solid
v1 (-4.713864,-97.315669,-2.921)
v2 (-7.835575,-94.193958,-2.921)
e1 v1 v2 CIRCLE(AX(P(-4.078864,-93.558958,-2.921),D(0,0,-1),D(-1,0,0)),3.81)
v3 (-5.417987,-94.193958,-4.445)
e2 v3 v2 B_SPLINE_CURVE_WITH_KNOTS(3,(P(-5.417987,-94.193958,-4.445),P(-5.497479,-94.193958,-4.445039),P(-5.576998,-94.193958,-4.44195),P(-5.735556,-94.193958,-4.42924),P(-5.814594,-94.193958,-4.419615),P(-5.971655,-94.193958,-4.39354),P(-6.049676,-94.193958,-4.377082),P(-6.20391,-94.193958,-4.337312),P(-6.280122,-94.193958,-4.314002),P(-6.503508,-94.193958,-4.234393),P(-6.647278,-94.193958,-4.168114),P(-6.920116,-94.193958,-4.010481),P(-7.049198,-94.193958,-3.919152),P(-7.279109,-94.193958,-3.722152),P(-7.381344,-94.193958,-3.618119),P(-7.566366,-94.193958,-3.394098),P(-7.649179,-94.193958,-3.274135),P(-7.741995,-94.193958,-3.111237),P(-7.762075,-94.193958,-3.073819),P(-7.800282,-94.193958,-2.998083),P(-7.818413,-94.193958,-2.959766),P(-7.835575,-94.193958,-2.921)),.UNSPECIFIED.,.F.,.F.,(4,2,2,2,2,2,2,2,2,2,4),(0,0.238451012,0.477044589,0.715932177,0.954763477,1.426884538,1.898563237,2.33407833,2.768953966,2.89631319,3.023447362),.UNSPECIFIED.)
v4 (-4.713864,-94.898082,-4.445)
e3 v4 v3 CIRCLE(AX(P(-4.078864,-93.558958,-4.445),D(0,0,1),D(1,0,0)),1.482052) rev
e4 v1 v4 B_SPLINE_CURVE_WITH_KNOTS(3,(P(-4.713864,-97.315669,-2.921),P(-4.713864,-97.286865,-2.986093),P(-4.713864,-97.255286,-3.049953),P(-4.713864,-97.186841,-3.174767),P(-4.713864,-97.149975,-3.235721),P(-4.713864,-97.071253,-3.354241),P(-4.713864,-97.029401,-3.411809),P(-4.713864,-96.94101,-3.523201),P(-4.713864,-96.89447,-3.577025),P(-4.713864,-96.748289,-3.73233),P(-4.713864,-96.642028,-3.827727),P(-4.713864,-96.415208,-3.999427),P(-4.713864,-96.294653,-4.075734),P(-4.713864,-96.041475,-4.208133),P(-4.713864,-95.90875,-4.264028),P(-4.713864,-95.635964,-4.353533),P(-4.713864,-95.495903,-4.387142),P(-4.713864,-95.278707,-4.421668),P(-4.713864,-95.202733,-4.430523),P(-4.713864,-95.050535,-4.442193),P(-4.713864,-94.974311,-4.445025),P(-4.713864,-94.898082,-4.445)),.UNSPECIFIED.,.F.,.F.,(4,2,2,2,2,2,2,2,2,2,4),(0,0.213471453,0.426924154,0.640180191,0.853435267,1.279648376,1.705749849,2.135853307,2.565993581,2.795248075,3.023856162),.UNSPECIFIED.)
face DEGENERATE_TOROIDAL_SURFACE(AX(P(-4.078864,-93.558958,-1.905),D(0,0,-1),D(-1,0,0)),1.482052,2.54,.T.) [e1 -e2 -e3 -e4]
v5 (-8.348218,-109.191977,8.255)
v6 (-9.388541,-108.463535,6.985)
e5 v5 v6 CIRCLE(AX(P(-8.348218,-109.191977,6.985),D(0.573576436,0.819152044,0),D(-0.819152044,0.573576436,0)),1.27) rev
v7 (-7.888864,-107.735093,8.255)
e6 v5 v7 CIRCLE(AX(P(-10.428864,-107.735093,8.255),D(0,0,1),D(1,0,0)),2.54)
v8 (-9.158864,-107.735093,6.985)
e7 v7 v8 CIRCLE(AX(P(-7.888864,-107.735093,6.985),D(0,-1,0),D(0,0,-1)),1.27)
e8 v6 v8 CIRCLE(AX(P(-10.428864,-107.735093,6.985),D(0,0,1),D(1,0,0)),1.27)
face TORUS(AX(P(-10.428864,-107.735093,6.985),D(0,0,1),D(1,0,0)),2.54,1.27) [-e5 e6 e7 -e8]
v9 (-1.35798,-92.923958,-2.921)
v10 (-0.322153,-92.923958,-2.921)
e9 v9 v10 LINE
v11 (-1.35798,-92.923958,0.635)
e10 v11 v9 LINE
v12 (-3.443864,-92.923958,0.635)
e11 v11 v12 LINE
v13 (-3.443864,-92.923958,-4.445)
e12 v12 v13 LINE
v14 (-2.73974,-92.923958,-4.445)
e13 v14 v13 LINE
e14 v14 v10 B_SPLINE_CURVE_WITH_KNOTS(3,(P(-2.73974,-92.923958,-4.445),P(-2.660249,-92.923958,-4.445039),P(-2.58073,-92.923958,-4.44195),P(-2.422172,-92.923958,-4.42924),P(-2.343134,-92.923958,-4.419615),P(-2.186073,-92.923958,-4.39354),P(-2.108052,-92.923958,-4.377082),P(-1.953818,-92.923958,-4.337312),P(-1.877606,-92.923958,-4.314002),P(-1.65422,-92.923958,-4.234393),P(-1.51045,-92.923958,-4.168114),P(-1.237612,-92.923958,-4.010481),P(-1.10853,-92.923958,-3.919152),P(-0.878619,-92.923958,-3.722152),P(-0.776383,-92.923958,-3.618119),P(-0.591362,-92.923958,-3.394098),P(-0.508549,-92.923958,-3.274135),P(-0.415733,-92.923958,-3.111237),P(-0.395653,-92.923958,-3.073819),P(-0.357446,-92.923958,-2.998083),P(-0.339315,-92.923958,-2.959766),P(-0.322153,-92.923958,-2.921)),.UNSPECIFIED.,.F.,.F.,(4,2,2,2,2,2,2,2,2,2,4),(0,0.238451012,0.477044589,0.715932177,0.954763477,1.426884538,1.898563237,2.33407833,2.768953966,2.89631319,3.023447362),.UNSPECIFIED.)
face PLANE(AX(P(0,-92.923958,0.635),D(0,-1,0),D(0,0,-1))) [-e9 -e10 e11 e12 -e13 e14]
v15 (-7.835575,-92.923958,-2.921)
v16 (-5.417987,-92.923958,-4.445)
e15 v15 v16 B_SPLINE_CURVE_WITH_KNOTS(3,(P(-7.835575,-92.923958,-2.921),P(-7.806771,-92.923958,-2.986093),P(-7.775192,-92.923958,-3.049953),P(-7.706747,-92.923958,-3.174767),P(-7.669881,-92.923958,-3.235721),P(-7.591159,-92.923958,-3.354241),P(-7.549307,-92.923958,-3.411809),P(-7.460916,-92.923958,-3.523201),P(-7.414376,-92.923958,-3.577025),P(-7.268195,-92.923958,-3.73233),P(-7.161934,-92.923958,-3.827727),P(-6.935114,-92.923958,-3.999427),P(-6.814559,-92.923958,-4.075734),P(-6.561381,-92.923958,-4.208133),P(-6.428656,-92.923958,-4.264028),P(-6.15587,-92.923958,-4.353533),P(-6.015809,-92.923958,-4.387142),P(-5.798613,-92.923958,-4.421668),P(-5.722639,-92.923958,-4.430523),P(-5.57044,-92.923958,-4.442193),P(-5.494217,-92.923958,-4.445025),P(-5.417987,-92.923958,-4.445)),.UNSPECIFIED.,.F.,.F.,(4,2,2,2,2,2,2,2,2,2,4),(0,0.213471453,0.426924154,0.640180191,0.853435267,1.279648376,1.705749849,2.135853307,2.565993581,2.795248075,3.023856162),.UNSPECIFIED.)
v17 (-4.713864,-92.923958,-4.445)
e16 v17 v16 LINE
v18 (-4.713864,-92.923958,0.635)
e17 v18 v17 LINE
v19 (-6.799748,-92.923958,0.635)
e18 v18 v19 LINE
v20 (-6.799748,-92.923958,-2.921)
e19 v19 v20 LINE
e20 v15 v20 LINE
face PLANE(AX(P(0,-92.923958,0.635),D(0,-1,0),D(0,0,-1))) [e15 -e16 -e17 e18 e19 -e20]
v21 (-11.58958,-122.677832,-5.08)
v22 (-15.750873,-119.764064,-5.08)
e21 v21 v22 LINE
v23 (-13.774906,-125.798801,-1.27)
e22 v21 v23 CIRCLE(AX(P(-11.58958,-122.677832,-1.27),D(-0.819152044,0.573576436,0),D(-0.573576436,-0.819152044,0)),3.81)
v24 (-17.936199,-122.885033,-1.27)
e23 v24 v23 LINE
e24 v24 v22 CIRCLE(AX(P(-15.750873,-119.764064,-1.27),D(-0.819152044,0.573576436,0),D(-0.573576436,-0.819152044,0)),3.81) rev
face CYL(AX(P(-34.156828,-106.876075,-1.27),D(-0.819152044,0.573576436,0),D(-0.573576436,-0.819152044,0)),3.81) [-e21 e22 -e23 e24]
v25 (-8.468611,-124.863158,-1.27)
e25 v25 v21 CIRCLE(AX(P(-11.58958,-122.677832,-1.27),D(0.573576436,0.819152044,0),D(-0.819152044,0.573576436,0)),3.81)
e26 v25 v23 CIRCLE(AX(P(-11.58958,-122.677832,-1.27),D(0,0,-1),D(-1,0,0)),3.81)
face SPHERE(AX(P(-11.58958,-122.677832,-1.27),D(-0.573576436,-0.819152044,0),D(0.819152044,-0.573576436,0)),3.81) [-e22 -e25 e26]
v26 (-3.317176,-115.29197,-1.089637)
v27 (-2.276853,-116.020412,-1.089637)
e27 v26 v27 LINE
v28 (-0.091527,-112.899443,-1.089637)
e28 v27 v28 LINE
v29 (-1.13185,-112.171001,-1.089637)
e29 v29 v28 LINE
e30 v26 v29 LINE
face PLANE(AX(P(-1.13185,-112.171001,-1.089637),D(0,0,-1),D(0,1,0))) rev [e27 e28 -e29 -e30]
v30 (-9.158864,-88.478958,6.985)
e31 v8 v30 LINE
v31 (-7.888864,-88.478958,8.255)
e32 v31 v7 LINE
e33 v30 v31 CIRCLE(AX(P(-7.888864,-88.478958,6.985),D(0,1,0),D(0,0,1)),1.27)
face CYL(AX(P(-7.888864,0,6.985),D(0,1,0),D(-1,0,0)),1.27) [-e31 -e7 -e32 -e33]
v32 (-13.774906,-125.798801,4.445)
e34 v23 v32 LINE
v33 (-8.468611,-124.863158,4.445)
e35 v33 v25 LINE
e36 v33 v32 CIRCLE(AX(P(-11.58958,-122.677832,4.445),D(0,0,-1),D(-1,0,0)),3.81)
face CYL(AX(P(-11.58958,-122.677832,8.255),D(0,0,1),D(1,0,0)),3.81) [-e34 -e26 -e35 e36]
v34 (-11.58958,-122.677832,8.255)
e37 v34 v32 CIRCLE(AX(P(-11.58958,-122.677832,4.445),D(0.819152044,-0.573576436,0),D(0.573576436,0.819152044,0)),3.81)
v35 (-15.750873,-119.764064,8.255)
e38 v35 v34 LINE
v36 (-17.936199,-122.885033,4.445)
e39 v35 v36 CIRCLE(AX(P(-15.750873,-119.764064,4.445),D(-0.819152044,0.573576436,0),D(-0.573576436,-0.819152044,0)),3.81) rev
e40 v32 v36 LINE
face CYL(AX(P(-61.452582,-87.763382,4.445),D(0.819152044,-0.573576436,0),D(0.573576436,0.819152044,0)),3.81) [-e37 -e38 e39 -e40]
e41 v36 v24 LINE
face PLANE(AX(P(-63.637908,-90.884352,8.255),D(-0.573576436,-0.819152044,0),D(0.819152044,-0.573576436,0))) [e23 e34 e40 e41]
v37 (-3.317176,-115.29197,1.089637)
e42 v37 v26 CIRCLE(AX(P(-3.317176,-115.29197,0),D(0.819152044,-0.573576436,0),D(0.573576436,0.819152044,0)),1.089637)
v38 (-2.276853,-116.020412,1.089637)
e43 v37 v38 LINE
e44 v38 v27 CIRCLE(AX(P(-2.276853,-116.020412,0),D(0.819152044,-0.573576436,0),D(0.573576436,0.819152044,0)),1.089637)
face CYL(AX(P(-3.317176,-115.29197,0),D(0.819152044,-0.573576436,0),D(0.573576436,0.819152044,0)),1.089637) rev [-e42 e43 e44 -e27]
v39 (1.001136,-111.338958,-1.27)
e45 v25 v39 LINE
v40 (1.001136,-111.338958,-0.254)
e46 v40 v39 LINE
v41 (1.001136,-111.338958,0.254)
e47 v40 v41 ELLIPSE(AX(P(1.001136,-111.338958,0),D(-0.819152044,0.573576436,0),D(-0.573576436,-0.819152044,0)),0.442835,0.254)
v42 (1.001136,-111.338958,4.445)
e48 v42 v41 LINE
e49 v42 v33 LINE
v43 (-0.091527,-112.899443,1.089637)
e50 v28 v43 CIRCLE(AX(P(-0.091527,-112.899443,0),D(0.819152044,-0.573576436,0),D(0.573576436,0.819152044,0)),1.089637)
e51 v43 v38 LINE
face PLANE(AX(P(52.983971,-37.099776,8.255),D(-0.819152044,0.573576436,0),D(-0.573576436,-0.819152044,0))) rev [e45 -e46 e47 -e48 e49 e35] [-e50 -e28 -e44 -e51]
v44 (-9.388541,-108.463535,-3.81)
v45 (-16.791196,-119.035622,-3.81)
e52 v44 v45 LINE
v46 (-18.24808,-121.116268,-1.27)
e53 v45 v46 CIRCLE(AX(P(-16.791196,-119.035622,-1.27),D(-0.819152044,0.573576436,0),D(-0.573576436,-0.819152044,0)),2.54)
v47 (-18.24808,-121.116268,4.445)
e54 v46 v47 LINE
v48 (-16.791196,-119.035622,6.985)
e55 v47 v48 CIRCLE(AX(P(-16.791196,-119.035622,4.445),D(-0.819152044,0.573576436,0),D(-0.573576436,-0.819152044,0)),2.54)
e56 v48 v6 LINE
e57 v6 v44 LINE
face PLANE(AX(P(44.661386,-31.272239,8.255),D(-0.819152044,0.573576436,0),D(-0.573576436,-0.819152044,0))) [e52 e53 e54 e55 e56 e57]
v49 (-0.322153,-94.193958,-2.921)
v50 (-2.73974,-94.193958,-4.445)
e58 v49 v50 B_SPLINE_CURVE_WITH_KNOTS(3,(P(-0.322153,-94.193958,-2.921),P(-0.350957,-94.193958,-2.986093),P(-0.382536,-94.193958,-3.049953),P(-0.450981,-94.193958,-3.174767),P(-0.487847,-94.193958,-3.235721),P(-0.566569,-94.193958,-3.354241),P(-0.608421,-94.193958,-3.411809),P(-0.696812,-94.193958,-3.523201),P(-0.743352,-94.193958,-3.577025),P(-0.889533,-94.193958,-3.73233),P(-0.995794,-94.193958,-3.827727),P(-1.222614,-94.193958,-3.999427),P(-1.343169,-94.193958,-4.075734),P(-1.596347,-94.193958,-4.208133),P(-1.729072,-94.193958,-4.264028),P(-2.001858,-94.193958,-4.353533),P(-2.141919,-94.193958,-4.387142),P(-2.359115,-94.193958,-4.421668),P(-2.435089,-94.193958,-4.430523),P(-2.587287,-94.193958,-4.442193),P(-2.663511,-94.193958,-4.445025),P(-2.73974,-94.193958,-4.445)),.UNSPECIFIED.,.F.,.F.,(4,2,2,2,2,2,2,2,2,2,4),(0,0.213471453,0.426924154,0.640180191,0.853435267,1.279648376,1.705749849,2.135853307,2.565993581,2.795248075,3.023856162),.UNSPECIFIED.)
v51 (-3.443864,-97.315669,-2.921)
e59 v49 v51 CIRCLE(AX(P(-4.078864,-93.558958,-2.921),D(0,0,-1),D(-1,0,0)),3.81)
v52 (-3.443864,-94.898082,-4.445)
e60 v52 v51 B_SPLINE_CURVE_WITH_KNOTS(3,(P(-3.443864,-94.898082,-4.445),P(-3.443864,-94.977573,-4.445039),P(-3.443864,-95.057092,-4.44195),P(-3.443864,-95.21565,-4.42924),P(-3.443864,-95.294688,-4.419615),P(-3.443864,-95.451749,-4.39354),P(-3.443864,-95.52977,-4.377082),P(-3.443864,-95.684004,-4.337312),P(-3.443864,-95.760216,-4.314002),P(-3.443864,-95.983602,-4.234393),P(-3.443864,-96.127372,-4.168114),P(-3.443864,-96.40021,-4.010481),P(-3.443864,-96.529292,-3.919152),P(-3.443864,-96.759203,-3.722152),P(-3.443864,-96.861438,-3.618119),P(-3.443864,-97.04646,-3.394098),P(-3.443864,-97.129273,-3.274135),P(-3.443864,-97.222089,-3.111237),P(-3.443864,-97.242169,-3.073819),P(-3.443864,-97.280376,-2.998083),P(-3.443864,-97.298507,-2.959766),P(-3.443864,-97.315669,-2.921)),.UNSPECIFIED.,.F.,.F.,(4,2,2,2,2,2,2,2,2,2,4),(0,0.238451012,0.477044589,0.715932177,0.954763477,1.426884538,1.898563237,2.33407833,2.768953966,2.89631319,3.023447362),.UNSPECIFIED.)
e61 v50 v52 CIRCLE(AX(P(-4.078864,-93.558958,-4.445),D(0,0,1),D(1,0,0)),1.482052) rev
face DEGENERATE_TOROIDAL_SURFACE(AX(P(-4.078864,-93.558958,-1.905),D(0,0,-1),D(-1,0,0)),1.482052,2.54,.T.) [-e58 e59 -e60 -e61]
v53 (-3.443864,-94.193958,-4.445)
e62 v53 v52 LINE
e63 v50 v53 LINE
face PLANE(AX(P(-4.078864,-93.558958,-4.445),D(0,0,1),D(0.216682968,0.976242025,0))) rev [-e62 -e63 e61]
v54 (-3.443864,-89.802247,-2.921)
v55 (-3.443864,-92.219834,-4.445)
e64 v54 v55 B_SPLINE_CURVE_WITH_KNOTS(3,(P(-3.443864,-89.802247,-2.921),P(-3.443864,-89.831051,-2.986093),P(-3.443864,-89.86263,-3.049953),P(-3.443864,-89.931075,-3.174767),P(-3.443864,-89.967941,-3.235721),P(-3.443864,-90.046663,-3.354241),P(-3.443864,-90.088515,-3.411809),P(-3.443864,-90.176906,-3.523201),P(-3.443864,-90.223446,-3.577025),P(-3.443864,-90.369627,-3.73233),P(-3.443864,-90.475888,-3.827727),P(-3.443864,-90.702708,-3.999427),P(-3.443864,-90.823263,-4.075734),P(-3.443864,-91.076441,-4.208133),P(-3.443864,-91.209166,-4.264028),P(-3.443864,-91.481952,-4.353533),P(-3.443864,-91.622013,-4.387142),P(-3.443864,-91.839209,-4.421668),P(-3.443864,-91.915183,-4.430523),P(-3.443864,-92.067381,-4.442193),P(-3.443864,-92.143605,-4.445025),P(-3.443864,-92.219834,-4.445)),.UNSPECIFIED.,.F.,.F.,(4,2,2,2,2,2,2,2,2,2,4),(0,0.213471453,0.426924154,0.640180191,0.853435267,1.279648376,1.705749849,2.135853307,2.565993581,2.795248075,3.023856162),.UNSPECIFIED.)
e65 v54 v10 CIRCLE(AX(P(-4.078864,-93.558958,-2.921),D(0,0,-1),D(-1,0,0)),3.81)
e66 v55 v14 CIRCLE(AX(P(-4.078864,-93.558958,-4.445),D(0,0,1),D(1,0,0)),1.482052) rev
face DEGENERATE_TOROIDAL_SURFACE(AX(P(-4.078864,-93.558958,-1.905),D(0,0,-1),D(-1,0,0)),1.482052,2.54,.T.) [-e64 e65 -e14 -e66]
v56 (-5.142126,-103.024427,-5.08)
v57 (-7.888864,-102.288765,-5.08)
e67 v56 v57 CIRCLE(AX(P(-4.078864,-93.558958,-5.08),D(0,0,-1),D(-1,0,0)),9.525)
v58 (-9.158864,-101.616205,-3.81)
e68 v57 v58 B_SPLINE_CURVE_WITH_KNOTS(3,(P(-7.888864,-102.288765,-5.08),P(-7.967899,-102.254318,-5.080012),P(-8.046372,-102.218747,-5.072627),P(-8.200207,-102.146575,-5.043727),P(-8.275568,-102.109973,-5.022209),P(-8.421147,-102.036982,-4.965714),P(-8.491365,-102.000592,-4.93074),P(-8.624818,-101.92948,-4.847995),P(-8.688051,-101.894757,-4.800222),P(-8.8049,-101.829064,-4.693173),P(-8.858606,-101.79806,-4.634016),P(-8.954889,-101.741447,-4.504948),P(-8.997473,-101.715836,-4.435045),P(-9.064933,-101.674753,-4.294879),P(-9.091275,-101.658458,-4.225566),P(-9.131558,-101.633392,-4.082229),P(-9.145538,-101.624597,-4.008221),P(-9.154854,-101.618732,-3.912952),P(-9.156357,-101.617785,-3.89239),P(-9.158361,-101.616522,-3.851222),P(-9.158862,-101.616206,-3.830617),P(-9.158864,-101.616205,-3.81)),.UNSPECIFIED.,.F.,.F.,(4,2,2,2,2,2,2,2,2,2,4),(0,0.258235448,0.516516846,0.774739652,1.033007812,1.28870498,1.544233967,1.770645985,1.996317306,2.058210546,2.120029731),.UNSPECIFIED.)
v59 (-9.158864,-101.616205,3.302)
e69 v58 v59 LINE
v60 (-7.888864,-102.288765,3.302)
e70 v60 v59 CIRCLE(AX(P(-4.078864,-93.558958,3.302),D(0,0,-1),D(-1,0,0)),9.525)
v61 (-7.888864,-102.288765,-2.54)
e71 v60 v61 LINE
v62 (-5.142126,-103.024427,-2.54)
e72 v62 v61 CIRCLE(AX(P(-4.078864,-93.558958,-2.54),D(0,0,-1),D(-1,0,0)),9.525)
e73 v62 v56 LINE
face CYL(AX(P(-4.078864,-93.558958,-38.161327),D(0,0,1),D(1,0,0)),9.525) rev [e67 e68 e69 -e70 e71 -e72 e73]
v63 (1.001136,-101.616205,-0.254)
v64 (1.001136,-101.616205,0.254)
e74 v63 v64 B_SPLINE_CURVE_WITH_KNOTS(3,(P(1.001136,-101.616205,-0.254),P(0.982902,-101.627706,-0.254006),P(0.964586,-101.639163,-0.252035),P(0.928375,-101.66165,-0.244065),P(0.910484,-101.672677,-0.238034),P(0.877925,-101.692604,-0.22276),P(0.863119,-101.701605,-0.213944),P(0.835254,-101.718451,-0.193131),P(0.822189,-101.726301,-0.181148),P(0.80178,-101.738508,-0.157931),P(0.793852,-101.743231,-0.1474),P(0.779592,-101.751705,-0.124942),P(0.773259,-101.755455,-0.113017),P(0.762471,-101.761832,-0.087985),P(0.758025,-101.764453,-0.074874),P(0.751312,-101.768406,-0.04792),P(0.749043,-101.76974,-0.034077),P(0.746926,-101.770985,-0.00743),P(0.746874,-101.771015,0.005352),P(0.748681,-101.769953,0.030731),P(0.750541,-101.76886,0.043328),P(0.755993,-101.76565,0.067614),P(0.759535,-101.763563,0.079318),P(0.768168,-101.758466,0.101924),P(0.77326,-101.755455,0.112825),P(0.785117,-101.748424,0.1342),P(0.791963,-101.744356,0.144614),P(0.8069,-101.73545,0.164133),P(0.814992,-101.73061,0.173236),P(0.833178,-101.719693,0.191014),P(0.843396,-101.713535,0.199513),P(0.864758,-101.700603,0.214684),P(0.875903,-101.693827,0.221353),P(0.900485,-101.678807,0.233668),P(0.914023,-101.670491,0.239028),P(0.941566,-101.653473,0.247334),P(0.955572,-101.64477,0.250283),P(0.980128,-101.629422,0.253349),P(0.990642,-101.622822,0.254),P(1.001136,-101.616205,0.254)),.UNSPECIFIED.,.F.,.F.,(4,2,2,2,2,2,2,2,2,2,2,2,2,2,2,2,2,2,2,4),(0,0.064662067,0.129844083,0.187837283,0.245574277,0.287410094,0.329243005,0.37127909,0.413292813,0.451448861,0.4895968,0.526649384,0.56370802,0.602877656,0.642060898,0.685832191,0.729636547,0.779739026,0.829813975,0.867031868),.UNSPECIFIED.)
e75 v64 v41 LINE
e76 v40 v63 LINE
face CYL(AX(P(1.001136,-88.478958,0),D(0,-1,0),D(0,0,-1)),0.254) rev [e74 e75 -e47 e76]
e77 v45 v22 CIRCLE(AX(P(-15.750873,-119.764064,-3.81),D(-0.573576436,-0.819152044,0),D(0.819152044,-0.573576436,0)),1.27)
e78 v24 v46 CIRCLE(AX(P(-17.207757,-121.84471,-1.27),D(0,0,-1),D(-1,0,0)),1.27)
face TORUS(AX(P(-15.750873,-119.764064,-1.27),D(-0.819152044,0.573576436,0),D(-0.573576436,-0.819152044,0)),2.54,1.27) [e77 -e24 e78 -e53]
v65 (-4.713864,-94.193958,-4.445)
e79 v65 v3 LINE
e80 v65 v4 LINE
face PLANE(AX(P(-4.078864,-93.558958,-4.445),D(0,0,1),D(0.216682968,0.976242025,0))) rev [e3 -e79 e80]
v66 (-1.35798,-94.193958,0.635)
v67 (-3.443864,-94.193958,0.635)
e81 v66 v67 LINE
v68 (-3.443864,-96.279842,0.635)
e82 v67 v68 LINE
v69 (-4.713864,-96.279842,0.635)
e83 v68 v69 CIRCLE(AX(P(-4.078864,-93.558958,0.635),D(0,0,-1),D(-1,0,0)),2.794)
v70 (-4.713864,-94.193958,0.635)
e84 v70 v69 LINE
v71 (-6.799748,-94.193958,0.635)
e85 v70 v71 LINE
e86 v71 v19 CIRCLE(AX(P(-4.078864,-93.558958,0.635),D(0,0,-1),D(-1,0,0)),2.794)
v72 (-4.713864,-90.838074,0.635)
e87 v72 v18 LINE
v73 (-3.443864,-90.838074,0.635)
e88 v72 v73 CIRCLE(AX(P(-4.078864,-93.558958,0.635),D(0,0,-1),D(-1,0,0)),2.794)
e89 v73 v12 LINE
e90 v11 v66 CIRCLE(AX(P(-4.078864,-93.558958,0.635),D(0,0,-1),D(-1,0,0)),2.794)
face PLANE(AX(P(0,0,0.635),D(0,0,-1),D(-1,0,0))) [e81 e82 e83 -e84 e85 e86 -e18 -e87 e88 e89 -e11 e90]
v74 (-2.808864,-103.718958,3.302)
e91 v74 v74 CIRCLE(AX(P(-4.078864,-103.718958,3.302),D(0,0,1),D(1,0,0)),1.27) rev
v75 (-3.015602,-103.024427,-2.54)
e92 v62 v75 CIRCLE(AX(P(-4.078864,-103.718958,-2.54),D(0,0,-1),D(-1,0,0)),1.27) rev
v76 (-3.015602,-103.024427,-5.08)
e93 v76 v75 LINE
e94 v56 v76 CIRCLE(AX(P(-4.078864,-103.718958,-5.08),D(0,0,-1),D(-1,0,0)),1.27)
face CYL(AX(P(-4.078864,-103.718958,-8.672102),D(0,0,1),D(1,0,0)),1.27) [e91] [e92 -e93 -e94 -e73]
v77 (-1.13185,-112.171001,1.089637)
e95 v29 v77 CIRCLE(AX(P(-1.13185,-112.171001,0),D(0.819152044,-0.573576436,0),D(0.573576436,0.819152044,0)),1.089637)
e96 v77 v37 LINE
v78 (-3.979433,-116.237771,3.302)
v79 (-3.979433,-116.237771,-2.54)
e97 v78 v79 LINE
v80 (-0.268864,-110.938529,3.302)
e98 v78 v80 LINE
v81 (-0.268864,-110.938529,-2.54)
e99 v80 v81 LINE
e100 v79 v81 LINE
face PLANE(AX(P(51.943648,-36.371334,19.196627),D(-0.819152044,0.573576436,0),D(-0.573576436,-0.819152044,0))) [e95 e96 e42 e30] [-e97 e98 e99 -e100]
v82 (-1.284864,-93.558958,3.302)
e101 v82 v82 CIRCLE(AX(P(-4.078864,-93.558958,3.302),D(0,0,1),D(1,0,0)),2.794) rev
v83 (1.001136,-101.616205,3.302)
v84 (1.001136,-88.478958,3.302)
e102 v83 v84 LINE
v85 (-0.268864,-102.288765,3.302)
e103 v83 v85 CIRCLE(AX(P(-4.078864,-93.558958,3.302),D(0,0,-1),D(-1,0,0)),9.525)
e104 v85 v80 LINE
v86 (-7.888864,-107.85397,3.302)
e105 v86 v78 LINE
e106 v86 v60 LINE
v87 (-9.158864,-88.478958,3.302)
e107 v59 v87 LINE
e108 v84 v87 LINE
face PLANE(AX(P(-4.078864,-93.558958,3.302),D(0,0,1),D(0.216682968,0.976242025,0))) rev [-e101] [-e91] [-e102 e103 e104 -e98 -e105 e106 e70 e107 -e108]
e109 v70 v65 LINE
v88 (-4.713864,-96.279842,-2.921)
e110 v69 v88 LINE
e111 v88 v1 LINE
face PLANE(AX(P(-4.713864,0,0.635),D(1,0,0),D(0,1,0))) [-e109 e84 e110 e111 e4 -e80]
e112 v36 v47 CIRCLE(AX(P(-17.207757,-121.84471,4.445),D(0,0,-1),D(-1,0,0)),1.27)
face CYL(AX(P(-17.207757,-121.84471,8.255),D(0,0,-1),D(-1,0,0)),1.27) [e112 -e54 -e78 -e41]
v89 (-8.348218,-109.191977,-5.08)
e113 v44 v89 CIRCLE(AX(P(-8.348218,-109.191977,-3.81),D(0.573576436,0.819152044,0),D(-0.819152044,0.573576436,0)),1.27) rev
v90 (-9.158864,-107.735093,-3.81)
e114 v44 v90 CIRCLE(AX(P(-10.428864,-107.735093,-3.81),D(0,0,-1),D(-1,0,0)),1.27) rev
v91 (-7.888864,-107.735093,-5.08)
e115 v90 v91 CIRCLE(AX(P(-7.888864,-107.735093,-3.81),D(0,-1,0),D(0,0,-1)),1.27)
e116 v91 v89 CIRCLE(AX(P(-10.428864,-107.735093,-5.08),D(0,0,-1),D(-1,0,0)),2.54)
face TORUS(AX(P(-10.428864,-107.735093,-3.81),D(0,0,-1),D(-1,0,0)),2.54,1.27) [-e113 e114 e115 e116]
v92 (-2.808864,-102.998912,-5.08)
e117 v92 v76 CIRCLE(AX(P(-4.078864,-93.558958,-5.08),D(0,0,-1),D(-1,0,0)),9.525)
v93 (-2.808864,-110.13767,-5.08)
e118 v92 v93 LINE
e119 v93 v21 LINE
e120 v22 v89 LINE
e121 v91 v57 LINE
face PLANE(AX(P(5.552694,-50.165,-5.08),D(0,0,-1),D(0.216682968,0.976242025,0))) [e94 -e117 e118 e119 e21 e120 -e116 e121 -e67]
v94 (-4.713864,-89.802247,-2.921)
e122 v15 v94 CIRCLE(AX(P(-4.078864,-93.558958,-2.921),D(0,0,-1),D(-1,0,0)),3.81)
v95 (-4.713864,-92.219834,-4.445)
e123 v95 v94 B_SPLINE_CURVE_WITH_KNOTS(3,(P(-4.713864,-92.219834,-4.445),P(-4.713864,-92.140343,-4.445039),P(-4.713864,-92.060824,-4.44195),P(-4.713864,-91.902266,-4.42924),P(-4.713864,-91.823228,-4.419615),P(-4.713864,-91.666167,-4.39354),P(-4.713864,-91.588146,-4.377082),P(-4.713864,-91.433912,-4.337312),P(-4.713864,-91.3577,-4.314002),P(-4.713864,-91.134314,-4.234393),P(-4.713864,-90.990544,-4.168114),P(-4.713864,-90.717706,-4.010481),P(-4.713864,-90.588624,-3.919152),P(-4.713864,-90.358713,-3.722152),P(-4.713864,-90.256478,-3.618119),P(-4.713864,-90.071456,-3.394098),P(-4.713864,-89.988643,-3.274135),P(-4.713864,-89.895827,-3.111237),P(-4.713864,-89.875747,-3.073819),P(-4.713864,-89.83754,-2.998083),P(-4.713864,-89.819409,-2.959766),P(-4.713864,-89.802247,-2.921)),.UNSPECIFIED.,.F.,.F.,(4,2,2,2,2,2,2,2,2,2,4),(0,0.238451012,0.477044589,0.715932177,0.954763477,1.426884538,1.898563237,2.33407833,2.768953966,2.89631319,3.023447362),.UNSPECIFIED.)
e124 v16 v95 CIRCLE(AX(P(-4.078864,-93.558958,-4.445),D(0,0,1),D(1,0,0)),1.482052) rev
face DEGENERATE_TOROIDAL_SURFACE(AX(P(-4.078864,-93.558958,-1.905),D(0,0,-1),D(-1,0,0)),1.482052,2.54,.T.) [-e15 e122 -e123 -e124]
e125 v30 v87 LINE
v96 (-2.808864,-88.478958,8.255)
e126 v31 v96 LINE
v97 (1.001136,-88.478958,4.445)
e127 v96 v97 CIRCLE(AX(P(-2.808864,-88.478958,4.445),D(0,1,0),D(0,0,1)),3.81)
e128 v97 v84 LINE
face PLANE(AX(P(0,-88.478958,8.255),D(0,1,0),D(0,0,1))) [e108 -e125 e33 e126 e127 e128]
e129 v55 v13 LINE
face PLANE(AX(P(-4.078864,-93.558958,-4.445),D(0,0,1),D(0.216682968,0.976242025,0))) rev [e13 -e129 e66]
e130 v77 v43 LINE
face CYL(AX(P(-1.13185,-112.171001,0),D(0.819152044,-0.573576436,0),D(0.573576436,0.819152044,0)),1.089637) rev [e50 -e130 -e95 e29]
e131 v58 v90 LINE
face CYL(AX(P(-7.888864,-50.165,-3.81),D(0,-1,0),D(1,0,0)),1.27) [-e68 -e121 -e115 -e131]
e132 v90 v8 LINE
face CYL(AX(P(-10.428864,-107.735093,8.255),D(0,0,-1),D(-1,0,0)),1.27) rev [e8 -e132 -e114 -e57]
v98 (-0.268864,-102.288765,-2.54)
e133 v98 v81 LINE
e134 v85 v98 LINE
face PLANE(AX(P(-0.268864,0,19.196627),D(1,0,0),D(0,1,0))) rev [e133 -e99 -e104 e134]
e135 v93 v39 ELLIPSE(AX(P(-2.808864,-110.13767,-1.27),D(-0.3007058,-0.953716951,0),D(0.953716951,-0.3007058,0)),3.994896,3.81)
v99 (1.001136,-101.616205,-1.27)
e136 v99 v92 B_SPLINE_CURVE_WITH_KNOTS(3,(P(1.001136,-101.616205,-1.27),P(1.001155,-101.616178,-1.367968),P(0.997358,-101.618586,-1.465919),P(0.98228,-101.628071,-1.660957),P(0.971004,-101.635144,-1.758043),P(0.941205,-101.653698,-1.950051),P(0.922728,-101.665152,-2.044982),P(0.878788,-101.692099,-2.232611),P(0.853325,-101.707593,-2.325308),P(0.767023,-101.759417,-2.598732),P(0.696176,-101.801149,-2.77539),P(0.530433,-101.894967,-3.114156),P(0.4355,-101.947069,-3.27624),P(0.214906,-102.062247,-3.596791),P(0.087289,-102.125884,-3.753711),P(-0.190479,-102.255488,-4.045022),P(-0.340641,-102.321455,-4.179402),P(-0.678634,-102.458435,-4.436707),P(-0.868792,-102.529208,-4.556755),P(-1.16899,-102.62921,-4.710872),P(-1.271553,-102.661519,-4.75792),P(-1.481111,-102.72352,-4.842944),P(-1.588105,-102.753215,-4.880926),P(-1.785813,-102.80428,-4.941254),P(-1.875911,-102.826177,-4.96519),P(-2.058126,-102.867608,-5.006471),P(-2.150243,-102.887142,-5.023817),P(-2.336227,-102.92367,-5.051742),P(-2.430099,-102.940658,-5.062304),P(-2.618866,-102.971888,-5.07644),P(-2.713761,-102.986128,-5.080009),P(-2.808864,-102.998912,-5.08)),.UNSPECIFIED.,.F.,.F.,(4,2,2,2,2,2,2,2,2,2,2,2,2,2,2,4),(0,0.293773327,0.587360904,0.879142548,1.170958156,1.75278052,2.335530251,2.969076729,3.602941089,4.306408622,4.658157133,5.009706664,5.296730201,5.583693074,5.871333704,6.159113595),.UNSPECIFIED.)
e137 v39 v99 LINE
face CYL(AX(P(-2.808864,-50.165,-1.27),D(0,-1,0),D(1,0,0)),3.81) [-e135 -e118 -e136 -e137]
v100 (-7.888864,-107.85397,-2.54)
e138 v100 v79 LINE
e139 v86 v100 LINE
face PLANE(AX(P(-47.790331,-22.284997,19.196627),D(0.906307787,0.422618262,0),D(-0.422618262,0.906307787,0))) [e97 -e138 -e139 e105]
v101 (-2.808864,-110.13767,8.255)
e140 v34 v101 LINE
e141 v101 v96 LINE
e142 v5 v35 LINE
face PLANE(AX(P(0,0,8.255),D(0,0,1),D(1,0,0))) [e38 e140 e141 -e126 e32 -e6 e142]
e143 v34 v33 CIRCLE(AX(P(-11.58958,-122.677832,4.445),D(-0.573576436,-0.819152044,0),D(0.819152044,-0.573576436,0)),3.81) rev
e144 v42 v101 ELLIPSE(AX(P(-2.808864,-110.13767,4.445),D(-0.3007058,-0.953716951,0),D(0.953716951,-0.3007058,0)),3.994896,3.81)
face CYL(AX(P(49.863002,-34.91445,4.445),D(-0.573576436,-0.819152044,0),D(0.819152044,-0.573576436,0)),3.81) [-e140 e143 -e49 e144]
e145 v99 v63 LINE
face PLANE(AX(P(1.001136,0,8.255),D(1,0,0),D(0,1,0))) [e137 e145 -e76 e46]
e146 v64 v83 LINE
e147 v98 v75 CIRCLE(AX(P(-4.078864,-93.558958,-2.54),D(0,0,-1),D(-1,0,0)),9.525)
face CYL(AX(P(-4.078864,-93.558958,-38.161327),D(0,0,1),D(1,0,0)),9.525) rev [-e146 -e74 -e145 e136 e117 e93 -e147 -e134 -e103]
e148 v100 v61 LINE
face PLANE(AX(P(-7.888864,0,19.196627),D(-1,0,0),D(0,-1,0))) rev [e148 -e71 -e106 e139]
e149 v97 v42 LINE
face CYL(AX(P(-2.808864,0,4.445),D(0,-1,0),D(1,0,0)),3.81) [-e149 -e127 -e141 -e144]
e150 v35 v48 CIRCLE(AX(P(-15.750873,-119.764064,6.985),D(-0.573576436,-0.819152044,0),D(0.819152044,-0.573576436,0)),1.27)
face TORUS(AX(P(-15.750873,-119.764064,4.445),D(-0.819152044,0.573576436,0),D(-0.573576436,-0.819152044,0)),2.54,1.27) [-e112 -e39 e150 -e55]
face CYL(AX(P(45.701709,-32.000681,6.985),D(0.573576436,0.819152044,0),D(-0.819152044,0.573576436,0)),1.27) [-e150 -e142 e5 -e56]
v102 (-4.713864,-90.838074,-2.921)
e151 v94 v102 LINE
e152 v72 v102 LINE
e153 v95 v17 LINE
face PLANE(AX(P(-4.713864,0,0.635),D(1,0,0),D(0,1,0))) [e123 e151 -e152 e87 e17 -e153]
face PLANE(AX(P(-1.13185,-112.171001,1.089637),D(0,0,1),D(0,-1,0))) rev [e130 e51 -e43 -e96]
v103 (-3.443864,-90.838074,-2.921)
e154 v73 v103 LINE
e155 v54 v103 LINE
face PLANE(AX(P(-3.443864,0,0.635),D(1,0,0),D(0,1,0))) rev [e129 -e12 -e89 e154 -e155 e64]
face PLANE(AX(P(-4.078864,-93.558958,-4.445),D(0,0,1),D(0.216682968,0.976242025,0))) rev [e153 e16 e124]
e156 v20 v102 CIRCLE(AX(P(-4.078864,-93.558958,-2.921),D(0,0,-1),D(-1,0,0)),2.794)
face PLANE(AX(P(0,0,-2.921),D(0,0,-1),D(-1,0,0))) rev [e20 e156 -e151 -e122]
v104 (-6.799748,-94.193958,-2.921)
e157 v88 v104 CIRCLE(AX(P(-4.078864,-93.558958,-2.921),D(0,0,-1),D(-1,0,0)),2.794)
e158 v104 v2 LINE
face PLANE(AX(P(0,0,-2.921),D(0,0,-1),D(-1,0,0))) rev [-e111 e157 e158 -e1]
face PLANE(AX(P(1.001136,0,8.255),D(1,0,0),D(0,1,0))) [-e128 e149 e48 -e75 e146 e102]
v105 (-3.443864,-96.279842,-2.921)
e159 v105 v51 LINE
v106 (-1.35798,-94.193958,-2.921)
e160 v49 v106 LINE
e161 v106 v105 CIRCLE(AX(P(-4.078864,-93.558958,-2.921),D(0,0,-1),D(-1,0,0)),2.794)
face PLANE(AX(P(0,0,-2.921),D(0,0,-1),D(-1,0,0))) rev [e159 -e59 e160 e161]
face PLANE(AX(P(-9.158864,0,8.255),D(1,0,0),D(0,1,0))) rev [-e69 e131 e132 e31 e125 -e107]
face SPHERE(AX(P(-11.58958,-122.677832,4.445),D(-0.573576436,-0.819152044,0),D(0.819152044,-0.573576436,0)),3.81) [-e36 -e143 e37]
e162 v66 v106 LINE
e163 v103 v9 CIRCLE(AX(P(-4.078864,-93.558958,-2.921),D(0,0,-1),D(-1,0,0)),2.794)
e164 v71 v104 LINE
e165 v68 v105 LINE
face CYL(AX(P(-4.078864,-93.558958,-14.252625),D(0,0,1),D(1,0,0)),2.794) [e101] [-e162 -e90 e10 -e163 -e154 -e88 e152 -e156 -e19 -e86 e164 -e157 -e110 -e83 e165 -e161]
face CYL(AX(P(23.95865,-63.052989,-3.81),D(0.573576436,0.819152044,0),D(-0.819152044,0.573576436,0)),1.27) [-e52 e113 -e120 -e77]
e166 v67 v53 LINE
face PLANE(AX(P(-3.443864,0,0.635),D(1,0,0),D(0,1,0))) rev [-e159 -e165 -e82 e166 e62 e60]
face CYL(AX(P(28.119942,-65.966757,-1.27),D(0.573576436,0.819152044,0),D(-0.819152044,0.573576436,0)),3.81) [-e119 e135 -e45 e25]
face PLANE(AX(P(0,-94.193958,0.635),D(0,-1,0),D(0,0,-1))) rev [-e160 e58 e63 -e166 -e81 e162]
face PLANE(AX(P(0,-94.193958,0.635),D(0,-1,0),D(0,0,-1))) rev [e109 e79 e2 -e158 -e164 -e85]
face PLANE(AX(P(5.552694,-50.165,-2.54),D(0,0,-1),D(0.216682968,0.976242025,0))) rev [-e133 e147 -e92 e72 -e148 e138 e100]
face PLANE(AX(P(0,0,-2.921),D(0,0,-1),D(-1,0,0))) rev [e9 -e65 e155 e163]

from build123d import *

# Parameters (mm, degrees)
BOSS_EXTRUDE1_DEPTH      = 5.715
BOSS_EXTRUDE1_DEPTH_BACK = 4.445
SKETCH2_R                = 2.7940000000000054
SKETCH3_W                = 1.269999999999993
SKETCH3_H                = 1.2700000000000102
CUT_EXTRUDE1_DEPTH       = 5.08
BOSS_EXTRUDE2_DEPTH      = 1.524
FILLET1_R                = 2.54
BOSS_EXTRUDE3_DEPTH      = 2.54
BOSS_EXTRUDE3_DEPTH_BACK = 2.413
SKETCH5_R                = 2.7940000000000054
BOSS_EXTRUDE4_DEPTH      = 8.382
CUT_EXTRUDE2_START       = -1.7145
CUT_EXTRUDE2_DEPTH       = 5.8420000000000005
CUT_EXTRUDE5_DEPTH       = 1.27
BOSS_EXTRUDE5_REACH      = 131.655
SKETCH11_R               = 1.2700000000000067
CUT_EXTRUDE6_DEPTH       = 31.835580227886044
CUT_EXTRUDE6_DEPTH_BACK  = 31.835580227886044
SKETCH12_R               = 0.25399999999999967
FILLET2_R                = 3.8099999999999996
FILLET3_R                = 3.8099999999999996
FILLET4_R                = 1.27


with BuildPart() as part:
    # Sketch2 → Boss-Extrude1 (new, two sides: drawn at the far end of the back side and taken through both)
    with BuildSketch(Plane.XY.offset(-BOSS_EXTRUDE1_DEPTH_BACK)):
        with Locations((-4.07886393202022, -93.55895801032833)):
            Circle(SKETCH2_R)
    extrude(amount=BOSS_EXTRUDE1_DEPTH + BOSS_EXTRUDE1_DEPTH_BACK)

    # Sketch3 → Cut-Extrude1 (cut)
    with BuildSketch(Plane(origin=(0, 0, -4.445), x_dir=(-1, 0, 0), z_dir=(0, 0, -1))):
        with BuildLine():
            Line((3.443863932020214, -94.1939580103283), (3.443863932020214, -92.9239580103283))
            Line((3.4438639320202142, -92.9239580103283), (1.357979700745413, -92.9239580103283))
            ThreePointArc((1.3579797007454042, -92.92395801032826), (1.3032030609678973, -93.23936024921431), (1.2848639320202149, -93.55895801032833))
            ThreePointArc((1.2848639320202149, -93.55895801032833), (1.3032030609678946, -93.87855577144232), (1.3579797007453935, -94.19395801032834))
            Line((1.357979700745402, -94.1939580103283), (3.4438639320202142, -94.1939580103283))
        make_face()
        with Locations((4.0788639320202105, -93.5589580103283)):
            Rectangle(SKETCH3_W, SKETCH3_H)
        with BuildLine():
            ThreePointArc((4.713863932020238, -90.8380737790535), (4.398461693134176, -90.783297139276), (4.078863932020155, -90.76495801032831))
            ThreePointArc((4.078863932020155, -90.76495801032831), (3.7592661709062294, -90.783297139276), (3.4438639320202613, -90.83807377905349))
            Line((3.4438639320202147, -90.83807377905347), (3.443863932020214, -92.9239580103283))
            Line((3.4438639320202142, -92.9239580103283), (4.713863932020207, -92.9239580103283))
            Line((4.713863932020207, -92.9239580103283), (4.713863932020208, -90.8380737790535))
        make_face()
        with BuildLine():
            Line((6.7997481632950585, -92.9239580103283), (4.713863932020207, -92.9239580103283))
            Line((4.713863932020207, -92.9239580103283), (4.713863932020207, -94.1939580103283))
            Line((4.713863932020207, -94.1939580103283), (6.7997481632950665, -94.1939580103283))
            ThreePointArc((6.79974816329506, -94.19395801032829), (6.854524803072549, -93.87855577144228), (6.872863932020225, -93.55895801032833))
            ThreePointArc((6.872863932020225, -93.55895801032833), (6.854524803072548, -93.23936024921436), (6.799748163295054, -92.92395801032833))
        make_face()
        with BuildLine():
            Line((4.713863932020207, -94.1939580103283), (3.4438639320202142, -94.1939580103283))
            Line((3.443863932020214, -94.1939580103283), (3.443863932020213, -96.27984224160318))
            ThreePointArc((3.4438639320202564, -96.27984224160316), (3.759266170906339, -96.33461888138066), (4.078863932020378, -96.35295801032834))
            ThreePointArc((4.078863932020378, -96.35295801032834), (4.398461693134285, -96.33461888138064), (4.713863932020234, -96.27984224160315))
            Line((4.713863932020206, -96.27984224160315), (4.713863932020207, -94.1939580103283))
        make_face()
    extrude(amount=-CUT_EXTRUDE1_DEPTH, mode=Mode.SUBTRACT)

    # Sketch4 → Boss-Extrude2 (add)
    with BuildSketch(Plane(origin=(0, 0, -4.445), x_dir=(-1, 0, 0), z_dir=(0, 0, -1))):
        with BuildLine():
            Line((0.3221532697519658, -92.9239580103283), (1.3579797007453926, -92.9239580103283))
            ThreePointArc((1.3579797007453926, -92.9239580103283), (2.1032075853849994, -91.58330166369309), (3.443863932020213, -90.83807377905349))
            Line((3.4438639320202116, -90.83807377905349), (3.443863932020211, -89.80224734806006))
            ThreePointArc((3.443863932020212, -89.80224734806006), (1.3847870956994783, -90.86488117400758), (0.32215326975196623, -92.9239580103283))
        make_face()
        with BuildLine():
            Line((3.4438639320202147, -97.31566867259657), (3.4438639320202142, -96.27984224160315))
            ThreePointArc((3.443863932020213, -96.27984224160315), (2.1032075853849905, -95.53461435696353), (1.3579797007453847, -94.1939580103283))
            Line((1.3579797007453842, -94.1939580103283), (0.32215326975196246, -94.1939580103283))
            ThreePointArc((0.3221532697519591, -94.1939580103283), (1.384787095699461, -96.25303484664906), (3.443863932020211, -97.31566867259659))
        make_face()
        with BuildLine():
            Line((4.713863932020205, -96.27984224160316), (4.713863932020205, -97.31566867259659))
            ThreePointArc((4.713863932020205, -97.31566867259659), (6.772940768340969, -96.25303484664907), (7.835574594288481, -94.1939580103283))
            Line((7.835574594288476, -94.1939580103283), (6.799748163295055, -94.1939580103283))
            ThreePointArc((6.799748163295052, -94.1939580103283), (6.054520278655444, -95.53461435696354), (4.713863932020207, -96.27984224160316))
        make_face()
        with BuildLine():
            Line((4.713863932020206, -89.80224734806005), (4.713863932020206, -90.83807377905347))
            ThreePointArc((4.713863932020206, -90.83807377905347), (6.054520278655427, -91.58330166369309), (6.799748163295051, -92.9239580103283))
            Line((6.799748163295051, -92.9239580103283), (7.835574594288472, -92.9239580103283))
            ThreePointArc((7.835574594288474, -92.9239580103283), (6.772940768340954, -90.86488117400756), (4.713863932020203, -89.80224734806006))
        make_face()
    extrude(amount=-BOSS_EXTRUDE2_DEPTH)

    # Fillet1
    # the kernel refuses this fillet: 2.54 mm, written as the material it takes off along each edge
    with BuildSketch(Plane(origin=(-4.0788639320202495, -93.55895801032834, -4.445), x_dir=(-0.9779601169479317, 0.2087917854207577, 0), z_dir=(-0.2087917854207577, -0.9779601169479317, 0))) as fillet1_piece_1:
        with BuildLine():
            CenterArc((1.4820515469624638, -2.54), FILLET1_R, 23.578178478201842, 66.42182152179817)
            Line((1.4820515469624638, 0), (1.4820515469624638, 0.05079999999999973))
            Line((1.4820515469624638, 0.05079999999999973), (3.8100000000000294, 0.05079999999999973))
            Line((3.8100000000000294, 0.05079999999999973), (3.8608000000000278, 0))
            ThreePointArc((3.8608000000000278, 0), (3.860800000000029, -0.762), (3.8565589690607793, -1.5036800000000001))
            Line((3.8565589690607793, -1.5036800000000001), (3.81000000000003, -1.524))
        make_face()
    revolve(axis=Axis((-4.0788639320202495, -93.55895801032834, -4.445), (0, 0, -1)), revolution_arc=245.89688563167445, mode=Mode.SUBTRACT)
    with BuildSketch(Plane(origin=(-4.078863932020237, -93.55895801032833, -4.445), x_dir=(0.20879178542072774, 0.9779601169479382, 0), z_dir=(-0.9779601169479382, 0.20879178542072774, 0))) as fillet1_piece_2:
        with BuildLine():
            CenterArc((1.4820515469624473, -2.54), FILLET1_R, 23.578178478201917, 66.42182152179808)
            Line((1.4820515469624473, 0), (1.4820515469624473, 0.05079999999999973))
            Line((1.4820515469624473, 0.05079999999999973), (3.8100000000000094, 0.05079999999999973))
            Line((3.8100000000000094, 0.05079999999999973), (3.8608000000000127, 0))
            ThreePointArc((3.8608000000000127, 0), (3.8608000000000127, -0.7619999999999991), (3.8565589690607562, -1.5036799999999984))
            Line((3.8565589690607562, -1.5036799999999984), (3.810000000000009, -1.5239999999999982))
        make_face()
    revolve(axis=Axis((-4.078863932020237, -93.55895801032833, -4.445), (0, 0, -1)), revolution_arc=245.89688563167698, mode=Mode.SUBTRACT)
    with BuildSketch(Plane(origin=(-4.078863932020216, -93.55895801032833, -4.445), x_dir=(0.9779601169479387, -0.2087917854207255, 0), z_dir=(0.2087917854207255, 0.9779601169479387, 0))) as fillet1_piece_3:
        with BuildLine():
            CenterArc((1.482051546962437, -2.5400000000000005), FILLET1_R, 23.578178478201817, 66.42182152179818)
            Line((1.482051546962437, 0), (1.482051546962437, 0.05079999999999975))
            Line((1.482051546962437, 0.05079999999999975), (3.8100000000000045, 0.05079999999999975))
            Line((3.8100000000000045, 0.05079999999999975), (3.860800000000004, 0))
            ThreePointArc((3.860800000000004, 0), (3.860800000000005, -0.7620000000000007), (3.856558969060754, -1.503680000000001))
            Line((3.856558969060754, -1.503680000000001), (3.810000000000004, -1.524000000000001))
        make_face()
    revolve(axis=Axis((-4.078863932020216, -93.55895801032833, -4.445), (0, 0, -1)), revolution_arc=245.89688563167826, mode=Mode.SUBTRACT)
    with BuildSketch(Plane(origin=(-4.078863932020221, -93.55895801032833, -4.445), x_dir=(-0.20879178542073795, -0.9779601169479358, 0), z_dir=(0.9779601169479358, -0.20879178542073795, 0))) as fillet1_piece_4:
        with BuildLine():
            CenterArc((1.482051546962436, -2.5399999999999996), FILLET1_R, 23.57817847820183, 66.42182152179817)
            Line((1.482051546962436, 0), (1.482051546962436, 0.05079999999999972))
            Line((1.482051546962436, 0.05079999999999972), (3.8100000000000027, 0.05079999999999972))
            Line((3.8100000000000027, 0.05079999999999972), (3.8608000000000064, 0))
            ThreePointArc((3.8608000000000064, 0), (3.8608000000000064, -0.7619999999999998), (3.85655896906075, -1.5036799999999997))
            Line((3.85655896906075, -1.5036799999999997), (3.8100000000000027, -1.5239999999999996))
        make_face()
    revolve(axis=Axis((-4.078863932020221, -93.55895801032833, -4.445), (0, 0, -1)), revolution_arc=245.8968856316771, mode=Mode.SUBTRACT)

    # Sketch5 → Boss-Extrude3 (add, two sides: drawn at the far end of the back side and taken through both)
    # profile 1 of 4: a face of its own
    with BuildSketch(Plane.XY.offset(5.714999999999999).offset(-BOSS_EXTRUDE3_DEPTH_BACK)):
        Polygon((-7.321448701996413, -105.51142141700173), (1.001136067979783, -111.33895801032831), (1.0011360679797812, -88.47895801032831), (-9.158863932020221, -88.47895801032831), (-9.158863932020218, -108.13552231531784), align=None)
        with Locations((-4.07886393202022, -93.55895801032833)):
            Circle(SKETCH5_R, mode=Mode.SUBTRACT)
    # profile 2 of 4: a face of its own
    with BuildSketch(Plane.XY.offset(5.714999999999999).offset(-BOSS_EXTRUDE3_DEPTH_BACK)):
        Polygon((-9.158863932020218, -111.33895801032831), (1.0011360679797825, -111.33895801032831), (-7.321448701996413, -105.51142141700173), (-9.158863932020203, -108.13552231531784), align=None)
    # profile 3 of 4: a face of its own
    with BuildSketch(Plane.XY.offset(5.714999999999999).offset(-BOSS_EXTRUDE3_DEPTH_BACK)):
        Polygon((-18.976521888649557, -122.1565909569541), (-10.653937118673376, -127.98412755028069), (1.0011360679797825, -111.33895801032831), (-9.158863932020218, -111.33895801032831), (-9.158863932020218, -108.13552231531784), align=None)
    # profile 4 of 4: a face of its own
    with BuildSketch(Plane.XY.offset(5.714999999999999).offset(-BOSS_EXTRUDE3_DEPTH_BACK)):
        with Locations((-4.07886393202022, -93.55895801032833)):
            Circle(SKETCH5_R)
    extrude(amount=BOSS_EXTRUDE3_DEPTH + BOSS_EXTRUDE3_DEPTH_BACK)

    # Sketch6 → Boss-Extrude4 (add)
    with BuildSketch(Plane(origin=(0, 0, 3.3019999999999996), x_dir=(-1, 0, 0), z_dir=(0, 0, -1))):
        with BuildLine():
            ThreePointArc((9.158863932020274, -101.61620474851374), (4.078863932020362, -103.08395801032833), (-1.0011360679795924, -101.6162047485139))
            Line((-1.0011360679797892, -101.61620474851397), (-1.0011360679797952, -111.33895801032828))
            Line((-1.0011360679797952, -111.33895801032828), (10.65393711867338, -127.98412755028066))
            Line((10.65393711867338, -127.98412755028066), (18.97652188864956, -122.1565909569541))
            Line((18.97652188864956, -122.1565909569541), (9.15886393202022, -108.13552231531789))
            Line((9.15886393202022, -108.13552231531789), (9.15886393202022, -101.61620474851372))
        make_face()
    extrude(amount=BOSS_EXTRUDE4_DEPTH)

    # Sketch9 → Cut-Extrude2 (cut)
    with BuildSketch(Plane(origin=(0, 0, 1.5874999999999995), x_dir=(-1, 0, 0), z_dir=(0, 0, -1)).offset(CUT_EXTRUDE2_START)):
        with BuildLine():
            ThreePointArc((7.8888639320202145, -102.2887647092192), (4.078863932020218, -103.08395801032832), (0.26886393202022063, -102.2887647092192))
            Line((0.2688639320202225, -102.2887647092192), (0.26886393202022346, -110.93852854845198))
            Line((0.2688639320202233, -110.93852854845198), (3.9794333963345303, -116.23777093279071))
            Line((3.9794333963345303, -116.23777093279071), (7.888863932020215, -107.85397009376136))
            Line((7.888863932020215, -107.85397009376136), (7.888863932020214, -102.2887647092192))
        make_face()
    extrude(amount=CUT_EXTRUDE2_DEPTH, mode=Mode.SUBTRACT)

    # Sketch10 → Cut-Extrude5 (cut)
    with BuildSketch(Plane(origin=(52.983971008867975, -37.099775904693615, 0), x_dir=(0, 0, -1), z_dir=(0.8191520442889951, -0.5735764363510415, 0))):
        with BuildLine():
            Line((1.0896366691639499, -92.53430700499268), (1.089636669163951, -96.34430700499269))
            ThreePointArc((1.089636669163951, -96.34430700499269), (3e-17, -97.43394367415664), (-1.0896366691639492, -96.34430700499269))
            Line((-1.0896366691639492, -96.34430700499269), (-1.0896366691639503, -92.53430700499268))
            ThreePointArc((-1.0896366691639503, -92.53430700499268), (-8.7e-16, -91.44467033582873), (1.0896366691639499, -92.53430700499268))
        make_face()
    extrude(amount=-CUT_EXTRUDE5_DEPTH, mode=Mode.SUBTRACT)

    # Boss-Extrude5: up to this face of the body (flat: up to its plane)
    boss_extrude5_end = Plane(part.part.faces().sort_by_distance((-7.766430245, -114.366891782, -5.08))[0])
    # Sketch11 → Boss-Extrude5 (add, up to the picked face)
    with BuildSketch(Plane(origin=(0, 0, 3.3019999999999996), x_dir=(-1, 0, 0), z_dir=(0, 0, -1)), mode=Mode.PRIVATE) as boss_extrude5_sk1:
        with Locations(Location((4.07886393202022, -103.71895801032832, 0), (0, 0, 180))):
            Circle(SKETCH11_R)
    boss_extrude5_tool1 = split(extrude(boss_extrude5_sk1.sketch, amount=BOSS_EXTRUDE5_REACH, mode=Mode.PRIVATE), bisect_by=boss_extrude5_end, keep=Keep.BOTH, mode=Mode.PRIVATE)
    add(boss_extrude5_tool1.solids().sort_by(Axis((-4.078864, -103.718958, 3.302), (0, 0, -1)))[0])

    # Sketch12 → Cut-Extrude6 (cut, two sides: drawn at the far end of the back side and taken through both)
    with BuildSketch(Plane(origin=(8.45e-15, -111.33895801032828, -1.1587e-13), x_dir=(-3.9e-16, 1.04e-15, -1), z_dir=(8e-17, -1, -1.04e-15)).offset(-CUT_EXTRUDE6_DEPTH_BACK)):
        with Locations((-1.1536e-13, 1.0011360679797674)):
            Circle(SKETCH12_R)
    extrude(amount=CUT_EXTRUDE6_DEPTH + CUT_EXTRUDE6_DEPTH_BACK, mode=Mode.SUBTRACT)

    # Fillet2
    fillet2_edges = [part.edges().sort_by_distance(p)[0] for p in [
        (1.001136067979782, -99.90895801032832, 8.254999999999999),
        (-4.826400525346797, -119.6615427803045, 8.254999999999999),
        (1.0011360679797923, -106.47758137942112, -5.08),
        (-4.826400525346792, -119.66154278030447, -5.08),
    ]]
    fillet(fillet2_edges, radius=FILLET2_R)

    # Fillet3
    fillet3_edges = [part.edges().sort_by_distance(p)[0] for p in [
        (-16.375714148032007, -123.97769614236866, -5.08),
        (-10.653937118673378, -127.98412755028068, 1.5874999999999995),
        (-16.375714148032, -123.97769614236866, 8.254999999999999),
        (-11.568047859470674, -127.34406031881595, 7.139076836320745),
        (-11.568047859470692, -127.34406031881595, -3.9640768363207504),
    ]]
    fillet(fillet3_edges, radius=FILLET3_R)

    # Fillet4
    fillet4_edges = [part.edges().sort_by_distance(p)[0] for p in [
        (-9.158863932020214, -108.13552231531787, 1.5874999999999995),
        (-9.15886393202022, -98.30724016282308, 8.254999999999999),
        (-9.15886393202022, -104.8758635319158, -5.08),
        (-12.975029799086151, -113.58557199176545, 8.254999999999999),
        (-18.97652188864956, -122.1565909569541, 1.5874999999999977),
        (-12.975029799086158, -113.58557199176546, -5.08),
        (-18.336454657184838, -121.2424802161568, -3.9640768363207477),
        (-18.336454657184838, -121.2424802161568, 7.139076836320744),
    ]]
    fillet(fillet4_edges, radius=FILLET4_R)


solid = part.part
